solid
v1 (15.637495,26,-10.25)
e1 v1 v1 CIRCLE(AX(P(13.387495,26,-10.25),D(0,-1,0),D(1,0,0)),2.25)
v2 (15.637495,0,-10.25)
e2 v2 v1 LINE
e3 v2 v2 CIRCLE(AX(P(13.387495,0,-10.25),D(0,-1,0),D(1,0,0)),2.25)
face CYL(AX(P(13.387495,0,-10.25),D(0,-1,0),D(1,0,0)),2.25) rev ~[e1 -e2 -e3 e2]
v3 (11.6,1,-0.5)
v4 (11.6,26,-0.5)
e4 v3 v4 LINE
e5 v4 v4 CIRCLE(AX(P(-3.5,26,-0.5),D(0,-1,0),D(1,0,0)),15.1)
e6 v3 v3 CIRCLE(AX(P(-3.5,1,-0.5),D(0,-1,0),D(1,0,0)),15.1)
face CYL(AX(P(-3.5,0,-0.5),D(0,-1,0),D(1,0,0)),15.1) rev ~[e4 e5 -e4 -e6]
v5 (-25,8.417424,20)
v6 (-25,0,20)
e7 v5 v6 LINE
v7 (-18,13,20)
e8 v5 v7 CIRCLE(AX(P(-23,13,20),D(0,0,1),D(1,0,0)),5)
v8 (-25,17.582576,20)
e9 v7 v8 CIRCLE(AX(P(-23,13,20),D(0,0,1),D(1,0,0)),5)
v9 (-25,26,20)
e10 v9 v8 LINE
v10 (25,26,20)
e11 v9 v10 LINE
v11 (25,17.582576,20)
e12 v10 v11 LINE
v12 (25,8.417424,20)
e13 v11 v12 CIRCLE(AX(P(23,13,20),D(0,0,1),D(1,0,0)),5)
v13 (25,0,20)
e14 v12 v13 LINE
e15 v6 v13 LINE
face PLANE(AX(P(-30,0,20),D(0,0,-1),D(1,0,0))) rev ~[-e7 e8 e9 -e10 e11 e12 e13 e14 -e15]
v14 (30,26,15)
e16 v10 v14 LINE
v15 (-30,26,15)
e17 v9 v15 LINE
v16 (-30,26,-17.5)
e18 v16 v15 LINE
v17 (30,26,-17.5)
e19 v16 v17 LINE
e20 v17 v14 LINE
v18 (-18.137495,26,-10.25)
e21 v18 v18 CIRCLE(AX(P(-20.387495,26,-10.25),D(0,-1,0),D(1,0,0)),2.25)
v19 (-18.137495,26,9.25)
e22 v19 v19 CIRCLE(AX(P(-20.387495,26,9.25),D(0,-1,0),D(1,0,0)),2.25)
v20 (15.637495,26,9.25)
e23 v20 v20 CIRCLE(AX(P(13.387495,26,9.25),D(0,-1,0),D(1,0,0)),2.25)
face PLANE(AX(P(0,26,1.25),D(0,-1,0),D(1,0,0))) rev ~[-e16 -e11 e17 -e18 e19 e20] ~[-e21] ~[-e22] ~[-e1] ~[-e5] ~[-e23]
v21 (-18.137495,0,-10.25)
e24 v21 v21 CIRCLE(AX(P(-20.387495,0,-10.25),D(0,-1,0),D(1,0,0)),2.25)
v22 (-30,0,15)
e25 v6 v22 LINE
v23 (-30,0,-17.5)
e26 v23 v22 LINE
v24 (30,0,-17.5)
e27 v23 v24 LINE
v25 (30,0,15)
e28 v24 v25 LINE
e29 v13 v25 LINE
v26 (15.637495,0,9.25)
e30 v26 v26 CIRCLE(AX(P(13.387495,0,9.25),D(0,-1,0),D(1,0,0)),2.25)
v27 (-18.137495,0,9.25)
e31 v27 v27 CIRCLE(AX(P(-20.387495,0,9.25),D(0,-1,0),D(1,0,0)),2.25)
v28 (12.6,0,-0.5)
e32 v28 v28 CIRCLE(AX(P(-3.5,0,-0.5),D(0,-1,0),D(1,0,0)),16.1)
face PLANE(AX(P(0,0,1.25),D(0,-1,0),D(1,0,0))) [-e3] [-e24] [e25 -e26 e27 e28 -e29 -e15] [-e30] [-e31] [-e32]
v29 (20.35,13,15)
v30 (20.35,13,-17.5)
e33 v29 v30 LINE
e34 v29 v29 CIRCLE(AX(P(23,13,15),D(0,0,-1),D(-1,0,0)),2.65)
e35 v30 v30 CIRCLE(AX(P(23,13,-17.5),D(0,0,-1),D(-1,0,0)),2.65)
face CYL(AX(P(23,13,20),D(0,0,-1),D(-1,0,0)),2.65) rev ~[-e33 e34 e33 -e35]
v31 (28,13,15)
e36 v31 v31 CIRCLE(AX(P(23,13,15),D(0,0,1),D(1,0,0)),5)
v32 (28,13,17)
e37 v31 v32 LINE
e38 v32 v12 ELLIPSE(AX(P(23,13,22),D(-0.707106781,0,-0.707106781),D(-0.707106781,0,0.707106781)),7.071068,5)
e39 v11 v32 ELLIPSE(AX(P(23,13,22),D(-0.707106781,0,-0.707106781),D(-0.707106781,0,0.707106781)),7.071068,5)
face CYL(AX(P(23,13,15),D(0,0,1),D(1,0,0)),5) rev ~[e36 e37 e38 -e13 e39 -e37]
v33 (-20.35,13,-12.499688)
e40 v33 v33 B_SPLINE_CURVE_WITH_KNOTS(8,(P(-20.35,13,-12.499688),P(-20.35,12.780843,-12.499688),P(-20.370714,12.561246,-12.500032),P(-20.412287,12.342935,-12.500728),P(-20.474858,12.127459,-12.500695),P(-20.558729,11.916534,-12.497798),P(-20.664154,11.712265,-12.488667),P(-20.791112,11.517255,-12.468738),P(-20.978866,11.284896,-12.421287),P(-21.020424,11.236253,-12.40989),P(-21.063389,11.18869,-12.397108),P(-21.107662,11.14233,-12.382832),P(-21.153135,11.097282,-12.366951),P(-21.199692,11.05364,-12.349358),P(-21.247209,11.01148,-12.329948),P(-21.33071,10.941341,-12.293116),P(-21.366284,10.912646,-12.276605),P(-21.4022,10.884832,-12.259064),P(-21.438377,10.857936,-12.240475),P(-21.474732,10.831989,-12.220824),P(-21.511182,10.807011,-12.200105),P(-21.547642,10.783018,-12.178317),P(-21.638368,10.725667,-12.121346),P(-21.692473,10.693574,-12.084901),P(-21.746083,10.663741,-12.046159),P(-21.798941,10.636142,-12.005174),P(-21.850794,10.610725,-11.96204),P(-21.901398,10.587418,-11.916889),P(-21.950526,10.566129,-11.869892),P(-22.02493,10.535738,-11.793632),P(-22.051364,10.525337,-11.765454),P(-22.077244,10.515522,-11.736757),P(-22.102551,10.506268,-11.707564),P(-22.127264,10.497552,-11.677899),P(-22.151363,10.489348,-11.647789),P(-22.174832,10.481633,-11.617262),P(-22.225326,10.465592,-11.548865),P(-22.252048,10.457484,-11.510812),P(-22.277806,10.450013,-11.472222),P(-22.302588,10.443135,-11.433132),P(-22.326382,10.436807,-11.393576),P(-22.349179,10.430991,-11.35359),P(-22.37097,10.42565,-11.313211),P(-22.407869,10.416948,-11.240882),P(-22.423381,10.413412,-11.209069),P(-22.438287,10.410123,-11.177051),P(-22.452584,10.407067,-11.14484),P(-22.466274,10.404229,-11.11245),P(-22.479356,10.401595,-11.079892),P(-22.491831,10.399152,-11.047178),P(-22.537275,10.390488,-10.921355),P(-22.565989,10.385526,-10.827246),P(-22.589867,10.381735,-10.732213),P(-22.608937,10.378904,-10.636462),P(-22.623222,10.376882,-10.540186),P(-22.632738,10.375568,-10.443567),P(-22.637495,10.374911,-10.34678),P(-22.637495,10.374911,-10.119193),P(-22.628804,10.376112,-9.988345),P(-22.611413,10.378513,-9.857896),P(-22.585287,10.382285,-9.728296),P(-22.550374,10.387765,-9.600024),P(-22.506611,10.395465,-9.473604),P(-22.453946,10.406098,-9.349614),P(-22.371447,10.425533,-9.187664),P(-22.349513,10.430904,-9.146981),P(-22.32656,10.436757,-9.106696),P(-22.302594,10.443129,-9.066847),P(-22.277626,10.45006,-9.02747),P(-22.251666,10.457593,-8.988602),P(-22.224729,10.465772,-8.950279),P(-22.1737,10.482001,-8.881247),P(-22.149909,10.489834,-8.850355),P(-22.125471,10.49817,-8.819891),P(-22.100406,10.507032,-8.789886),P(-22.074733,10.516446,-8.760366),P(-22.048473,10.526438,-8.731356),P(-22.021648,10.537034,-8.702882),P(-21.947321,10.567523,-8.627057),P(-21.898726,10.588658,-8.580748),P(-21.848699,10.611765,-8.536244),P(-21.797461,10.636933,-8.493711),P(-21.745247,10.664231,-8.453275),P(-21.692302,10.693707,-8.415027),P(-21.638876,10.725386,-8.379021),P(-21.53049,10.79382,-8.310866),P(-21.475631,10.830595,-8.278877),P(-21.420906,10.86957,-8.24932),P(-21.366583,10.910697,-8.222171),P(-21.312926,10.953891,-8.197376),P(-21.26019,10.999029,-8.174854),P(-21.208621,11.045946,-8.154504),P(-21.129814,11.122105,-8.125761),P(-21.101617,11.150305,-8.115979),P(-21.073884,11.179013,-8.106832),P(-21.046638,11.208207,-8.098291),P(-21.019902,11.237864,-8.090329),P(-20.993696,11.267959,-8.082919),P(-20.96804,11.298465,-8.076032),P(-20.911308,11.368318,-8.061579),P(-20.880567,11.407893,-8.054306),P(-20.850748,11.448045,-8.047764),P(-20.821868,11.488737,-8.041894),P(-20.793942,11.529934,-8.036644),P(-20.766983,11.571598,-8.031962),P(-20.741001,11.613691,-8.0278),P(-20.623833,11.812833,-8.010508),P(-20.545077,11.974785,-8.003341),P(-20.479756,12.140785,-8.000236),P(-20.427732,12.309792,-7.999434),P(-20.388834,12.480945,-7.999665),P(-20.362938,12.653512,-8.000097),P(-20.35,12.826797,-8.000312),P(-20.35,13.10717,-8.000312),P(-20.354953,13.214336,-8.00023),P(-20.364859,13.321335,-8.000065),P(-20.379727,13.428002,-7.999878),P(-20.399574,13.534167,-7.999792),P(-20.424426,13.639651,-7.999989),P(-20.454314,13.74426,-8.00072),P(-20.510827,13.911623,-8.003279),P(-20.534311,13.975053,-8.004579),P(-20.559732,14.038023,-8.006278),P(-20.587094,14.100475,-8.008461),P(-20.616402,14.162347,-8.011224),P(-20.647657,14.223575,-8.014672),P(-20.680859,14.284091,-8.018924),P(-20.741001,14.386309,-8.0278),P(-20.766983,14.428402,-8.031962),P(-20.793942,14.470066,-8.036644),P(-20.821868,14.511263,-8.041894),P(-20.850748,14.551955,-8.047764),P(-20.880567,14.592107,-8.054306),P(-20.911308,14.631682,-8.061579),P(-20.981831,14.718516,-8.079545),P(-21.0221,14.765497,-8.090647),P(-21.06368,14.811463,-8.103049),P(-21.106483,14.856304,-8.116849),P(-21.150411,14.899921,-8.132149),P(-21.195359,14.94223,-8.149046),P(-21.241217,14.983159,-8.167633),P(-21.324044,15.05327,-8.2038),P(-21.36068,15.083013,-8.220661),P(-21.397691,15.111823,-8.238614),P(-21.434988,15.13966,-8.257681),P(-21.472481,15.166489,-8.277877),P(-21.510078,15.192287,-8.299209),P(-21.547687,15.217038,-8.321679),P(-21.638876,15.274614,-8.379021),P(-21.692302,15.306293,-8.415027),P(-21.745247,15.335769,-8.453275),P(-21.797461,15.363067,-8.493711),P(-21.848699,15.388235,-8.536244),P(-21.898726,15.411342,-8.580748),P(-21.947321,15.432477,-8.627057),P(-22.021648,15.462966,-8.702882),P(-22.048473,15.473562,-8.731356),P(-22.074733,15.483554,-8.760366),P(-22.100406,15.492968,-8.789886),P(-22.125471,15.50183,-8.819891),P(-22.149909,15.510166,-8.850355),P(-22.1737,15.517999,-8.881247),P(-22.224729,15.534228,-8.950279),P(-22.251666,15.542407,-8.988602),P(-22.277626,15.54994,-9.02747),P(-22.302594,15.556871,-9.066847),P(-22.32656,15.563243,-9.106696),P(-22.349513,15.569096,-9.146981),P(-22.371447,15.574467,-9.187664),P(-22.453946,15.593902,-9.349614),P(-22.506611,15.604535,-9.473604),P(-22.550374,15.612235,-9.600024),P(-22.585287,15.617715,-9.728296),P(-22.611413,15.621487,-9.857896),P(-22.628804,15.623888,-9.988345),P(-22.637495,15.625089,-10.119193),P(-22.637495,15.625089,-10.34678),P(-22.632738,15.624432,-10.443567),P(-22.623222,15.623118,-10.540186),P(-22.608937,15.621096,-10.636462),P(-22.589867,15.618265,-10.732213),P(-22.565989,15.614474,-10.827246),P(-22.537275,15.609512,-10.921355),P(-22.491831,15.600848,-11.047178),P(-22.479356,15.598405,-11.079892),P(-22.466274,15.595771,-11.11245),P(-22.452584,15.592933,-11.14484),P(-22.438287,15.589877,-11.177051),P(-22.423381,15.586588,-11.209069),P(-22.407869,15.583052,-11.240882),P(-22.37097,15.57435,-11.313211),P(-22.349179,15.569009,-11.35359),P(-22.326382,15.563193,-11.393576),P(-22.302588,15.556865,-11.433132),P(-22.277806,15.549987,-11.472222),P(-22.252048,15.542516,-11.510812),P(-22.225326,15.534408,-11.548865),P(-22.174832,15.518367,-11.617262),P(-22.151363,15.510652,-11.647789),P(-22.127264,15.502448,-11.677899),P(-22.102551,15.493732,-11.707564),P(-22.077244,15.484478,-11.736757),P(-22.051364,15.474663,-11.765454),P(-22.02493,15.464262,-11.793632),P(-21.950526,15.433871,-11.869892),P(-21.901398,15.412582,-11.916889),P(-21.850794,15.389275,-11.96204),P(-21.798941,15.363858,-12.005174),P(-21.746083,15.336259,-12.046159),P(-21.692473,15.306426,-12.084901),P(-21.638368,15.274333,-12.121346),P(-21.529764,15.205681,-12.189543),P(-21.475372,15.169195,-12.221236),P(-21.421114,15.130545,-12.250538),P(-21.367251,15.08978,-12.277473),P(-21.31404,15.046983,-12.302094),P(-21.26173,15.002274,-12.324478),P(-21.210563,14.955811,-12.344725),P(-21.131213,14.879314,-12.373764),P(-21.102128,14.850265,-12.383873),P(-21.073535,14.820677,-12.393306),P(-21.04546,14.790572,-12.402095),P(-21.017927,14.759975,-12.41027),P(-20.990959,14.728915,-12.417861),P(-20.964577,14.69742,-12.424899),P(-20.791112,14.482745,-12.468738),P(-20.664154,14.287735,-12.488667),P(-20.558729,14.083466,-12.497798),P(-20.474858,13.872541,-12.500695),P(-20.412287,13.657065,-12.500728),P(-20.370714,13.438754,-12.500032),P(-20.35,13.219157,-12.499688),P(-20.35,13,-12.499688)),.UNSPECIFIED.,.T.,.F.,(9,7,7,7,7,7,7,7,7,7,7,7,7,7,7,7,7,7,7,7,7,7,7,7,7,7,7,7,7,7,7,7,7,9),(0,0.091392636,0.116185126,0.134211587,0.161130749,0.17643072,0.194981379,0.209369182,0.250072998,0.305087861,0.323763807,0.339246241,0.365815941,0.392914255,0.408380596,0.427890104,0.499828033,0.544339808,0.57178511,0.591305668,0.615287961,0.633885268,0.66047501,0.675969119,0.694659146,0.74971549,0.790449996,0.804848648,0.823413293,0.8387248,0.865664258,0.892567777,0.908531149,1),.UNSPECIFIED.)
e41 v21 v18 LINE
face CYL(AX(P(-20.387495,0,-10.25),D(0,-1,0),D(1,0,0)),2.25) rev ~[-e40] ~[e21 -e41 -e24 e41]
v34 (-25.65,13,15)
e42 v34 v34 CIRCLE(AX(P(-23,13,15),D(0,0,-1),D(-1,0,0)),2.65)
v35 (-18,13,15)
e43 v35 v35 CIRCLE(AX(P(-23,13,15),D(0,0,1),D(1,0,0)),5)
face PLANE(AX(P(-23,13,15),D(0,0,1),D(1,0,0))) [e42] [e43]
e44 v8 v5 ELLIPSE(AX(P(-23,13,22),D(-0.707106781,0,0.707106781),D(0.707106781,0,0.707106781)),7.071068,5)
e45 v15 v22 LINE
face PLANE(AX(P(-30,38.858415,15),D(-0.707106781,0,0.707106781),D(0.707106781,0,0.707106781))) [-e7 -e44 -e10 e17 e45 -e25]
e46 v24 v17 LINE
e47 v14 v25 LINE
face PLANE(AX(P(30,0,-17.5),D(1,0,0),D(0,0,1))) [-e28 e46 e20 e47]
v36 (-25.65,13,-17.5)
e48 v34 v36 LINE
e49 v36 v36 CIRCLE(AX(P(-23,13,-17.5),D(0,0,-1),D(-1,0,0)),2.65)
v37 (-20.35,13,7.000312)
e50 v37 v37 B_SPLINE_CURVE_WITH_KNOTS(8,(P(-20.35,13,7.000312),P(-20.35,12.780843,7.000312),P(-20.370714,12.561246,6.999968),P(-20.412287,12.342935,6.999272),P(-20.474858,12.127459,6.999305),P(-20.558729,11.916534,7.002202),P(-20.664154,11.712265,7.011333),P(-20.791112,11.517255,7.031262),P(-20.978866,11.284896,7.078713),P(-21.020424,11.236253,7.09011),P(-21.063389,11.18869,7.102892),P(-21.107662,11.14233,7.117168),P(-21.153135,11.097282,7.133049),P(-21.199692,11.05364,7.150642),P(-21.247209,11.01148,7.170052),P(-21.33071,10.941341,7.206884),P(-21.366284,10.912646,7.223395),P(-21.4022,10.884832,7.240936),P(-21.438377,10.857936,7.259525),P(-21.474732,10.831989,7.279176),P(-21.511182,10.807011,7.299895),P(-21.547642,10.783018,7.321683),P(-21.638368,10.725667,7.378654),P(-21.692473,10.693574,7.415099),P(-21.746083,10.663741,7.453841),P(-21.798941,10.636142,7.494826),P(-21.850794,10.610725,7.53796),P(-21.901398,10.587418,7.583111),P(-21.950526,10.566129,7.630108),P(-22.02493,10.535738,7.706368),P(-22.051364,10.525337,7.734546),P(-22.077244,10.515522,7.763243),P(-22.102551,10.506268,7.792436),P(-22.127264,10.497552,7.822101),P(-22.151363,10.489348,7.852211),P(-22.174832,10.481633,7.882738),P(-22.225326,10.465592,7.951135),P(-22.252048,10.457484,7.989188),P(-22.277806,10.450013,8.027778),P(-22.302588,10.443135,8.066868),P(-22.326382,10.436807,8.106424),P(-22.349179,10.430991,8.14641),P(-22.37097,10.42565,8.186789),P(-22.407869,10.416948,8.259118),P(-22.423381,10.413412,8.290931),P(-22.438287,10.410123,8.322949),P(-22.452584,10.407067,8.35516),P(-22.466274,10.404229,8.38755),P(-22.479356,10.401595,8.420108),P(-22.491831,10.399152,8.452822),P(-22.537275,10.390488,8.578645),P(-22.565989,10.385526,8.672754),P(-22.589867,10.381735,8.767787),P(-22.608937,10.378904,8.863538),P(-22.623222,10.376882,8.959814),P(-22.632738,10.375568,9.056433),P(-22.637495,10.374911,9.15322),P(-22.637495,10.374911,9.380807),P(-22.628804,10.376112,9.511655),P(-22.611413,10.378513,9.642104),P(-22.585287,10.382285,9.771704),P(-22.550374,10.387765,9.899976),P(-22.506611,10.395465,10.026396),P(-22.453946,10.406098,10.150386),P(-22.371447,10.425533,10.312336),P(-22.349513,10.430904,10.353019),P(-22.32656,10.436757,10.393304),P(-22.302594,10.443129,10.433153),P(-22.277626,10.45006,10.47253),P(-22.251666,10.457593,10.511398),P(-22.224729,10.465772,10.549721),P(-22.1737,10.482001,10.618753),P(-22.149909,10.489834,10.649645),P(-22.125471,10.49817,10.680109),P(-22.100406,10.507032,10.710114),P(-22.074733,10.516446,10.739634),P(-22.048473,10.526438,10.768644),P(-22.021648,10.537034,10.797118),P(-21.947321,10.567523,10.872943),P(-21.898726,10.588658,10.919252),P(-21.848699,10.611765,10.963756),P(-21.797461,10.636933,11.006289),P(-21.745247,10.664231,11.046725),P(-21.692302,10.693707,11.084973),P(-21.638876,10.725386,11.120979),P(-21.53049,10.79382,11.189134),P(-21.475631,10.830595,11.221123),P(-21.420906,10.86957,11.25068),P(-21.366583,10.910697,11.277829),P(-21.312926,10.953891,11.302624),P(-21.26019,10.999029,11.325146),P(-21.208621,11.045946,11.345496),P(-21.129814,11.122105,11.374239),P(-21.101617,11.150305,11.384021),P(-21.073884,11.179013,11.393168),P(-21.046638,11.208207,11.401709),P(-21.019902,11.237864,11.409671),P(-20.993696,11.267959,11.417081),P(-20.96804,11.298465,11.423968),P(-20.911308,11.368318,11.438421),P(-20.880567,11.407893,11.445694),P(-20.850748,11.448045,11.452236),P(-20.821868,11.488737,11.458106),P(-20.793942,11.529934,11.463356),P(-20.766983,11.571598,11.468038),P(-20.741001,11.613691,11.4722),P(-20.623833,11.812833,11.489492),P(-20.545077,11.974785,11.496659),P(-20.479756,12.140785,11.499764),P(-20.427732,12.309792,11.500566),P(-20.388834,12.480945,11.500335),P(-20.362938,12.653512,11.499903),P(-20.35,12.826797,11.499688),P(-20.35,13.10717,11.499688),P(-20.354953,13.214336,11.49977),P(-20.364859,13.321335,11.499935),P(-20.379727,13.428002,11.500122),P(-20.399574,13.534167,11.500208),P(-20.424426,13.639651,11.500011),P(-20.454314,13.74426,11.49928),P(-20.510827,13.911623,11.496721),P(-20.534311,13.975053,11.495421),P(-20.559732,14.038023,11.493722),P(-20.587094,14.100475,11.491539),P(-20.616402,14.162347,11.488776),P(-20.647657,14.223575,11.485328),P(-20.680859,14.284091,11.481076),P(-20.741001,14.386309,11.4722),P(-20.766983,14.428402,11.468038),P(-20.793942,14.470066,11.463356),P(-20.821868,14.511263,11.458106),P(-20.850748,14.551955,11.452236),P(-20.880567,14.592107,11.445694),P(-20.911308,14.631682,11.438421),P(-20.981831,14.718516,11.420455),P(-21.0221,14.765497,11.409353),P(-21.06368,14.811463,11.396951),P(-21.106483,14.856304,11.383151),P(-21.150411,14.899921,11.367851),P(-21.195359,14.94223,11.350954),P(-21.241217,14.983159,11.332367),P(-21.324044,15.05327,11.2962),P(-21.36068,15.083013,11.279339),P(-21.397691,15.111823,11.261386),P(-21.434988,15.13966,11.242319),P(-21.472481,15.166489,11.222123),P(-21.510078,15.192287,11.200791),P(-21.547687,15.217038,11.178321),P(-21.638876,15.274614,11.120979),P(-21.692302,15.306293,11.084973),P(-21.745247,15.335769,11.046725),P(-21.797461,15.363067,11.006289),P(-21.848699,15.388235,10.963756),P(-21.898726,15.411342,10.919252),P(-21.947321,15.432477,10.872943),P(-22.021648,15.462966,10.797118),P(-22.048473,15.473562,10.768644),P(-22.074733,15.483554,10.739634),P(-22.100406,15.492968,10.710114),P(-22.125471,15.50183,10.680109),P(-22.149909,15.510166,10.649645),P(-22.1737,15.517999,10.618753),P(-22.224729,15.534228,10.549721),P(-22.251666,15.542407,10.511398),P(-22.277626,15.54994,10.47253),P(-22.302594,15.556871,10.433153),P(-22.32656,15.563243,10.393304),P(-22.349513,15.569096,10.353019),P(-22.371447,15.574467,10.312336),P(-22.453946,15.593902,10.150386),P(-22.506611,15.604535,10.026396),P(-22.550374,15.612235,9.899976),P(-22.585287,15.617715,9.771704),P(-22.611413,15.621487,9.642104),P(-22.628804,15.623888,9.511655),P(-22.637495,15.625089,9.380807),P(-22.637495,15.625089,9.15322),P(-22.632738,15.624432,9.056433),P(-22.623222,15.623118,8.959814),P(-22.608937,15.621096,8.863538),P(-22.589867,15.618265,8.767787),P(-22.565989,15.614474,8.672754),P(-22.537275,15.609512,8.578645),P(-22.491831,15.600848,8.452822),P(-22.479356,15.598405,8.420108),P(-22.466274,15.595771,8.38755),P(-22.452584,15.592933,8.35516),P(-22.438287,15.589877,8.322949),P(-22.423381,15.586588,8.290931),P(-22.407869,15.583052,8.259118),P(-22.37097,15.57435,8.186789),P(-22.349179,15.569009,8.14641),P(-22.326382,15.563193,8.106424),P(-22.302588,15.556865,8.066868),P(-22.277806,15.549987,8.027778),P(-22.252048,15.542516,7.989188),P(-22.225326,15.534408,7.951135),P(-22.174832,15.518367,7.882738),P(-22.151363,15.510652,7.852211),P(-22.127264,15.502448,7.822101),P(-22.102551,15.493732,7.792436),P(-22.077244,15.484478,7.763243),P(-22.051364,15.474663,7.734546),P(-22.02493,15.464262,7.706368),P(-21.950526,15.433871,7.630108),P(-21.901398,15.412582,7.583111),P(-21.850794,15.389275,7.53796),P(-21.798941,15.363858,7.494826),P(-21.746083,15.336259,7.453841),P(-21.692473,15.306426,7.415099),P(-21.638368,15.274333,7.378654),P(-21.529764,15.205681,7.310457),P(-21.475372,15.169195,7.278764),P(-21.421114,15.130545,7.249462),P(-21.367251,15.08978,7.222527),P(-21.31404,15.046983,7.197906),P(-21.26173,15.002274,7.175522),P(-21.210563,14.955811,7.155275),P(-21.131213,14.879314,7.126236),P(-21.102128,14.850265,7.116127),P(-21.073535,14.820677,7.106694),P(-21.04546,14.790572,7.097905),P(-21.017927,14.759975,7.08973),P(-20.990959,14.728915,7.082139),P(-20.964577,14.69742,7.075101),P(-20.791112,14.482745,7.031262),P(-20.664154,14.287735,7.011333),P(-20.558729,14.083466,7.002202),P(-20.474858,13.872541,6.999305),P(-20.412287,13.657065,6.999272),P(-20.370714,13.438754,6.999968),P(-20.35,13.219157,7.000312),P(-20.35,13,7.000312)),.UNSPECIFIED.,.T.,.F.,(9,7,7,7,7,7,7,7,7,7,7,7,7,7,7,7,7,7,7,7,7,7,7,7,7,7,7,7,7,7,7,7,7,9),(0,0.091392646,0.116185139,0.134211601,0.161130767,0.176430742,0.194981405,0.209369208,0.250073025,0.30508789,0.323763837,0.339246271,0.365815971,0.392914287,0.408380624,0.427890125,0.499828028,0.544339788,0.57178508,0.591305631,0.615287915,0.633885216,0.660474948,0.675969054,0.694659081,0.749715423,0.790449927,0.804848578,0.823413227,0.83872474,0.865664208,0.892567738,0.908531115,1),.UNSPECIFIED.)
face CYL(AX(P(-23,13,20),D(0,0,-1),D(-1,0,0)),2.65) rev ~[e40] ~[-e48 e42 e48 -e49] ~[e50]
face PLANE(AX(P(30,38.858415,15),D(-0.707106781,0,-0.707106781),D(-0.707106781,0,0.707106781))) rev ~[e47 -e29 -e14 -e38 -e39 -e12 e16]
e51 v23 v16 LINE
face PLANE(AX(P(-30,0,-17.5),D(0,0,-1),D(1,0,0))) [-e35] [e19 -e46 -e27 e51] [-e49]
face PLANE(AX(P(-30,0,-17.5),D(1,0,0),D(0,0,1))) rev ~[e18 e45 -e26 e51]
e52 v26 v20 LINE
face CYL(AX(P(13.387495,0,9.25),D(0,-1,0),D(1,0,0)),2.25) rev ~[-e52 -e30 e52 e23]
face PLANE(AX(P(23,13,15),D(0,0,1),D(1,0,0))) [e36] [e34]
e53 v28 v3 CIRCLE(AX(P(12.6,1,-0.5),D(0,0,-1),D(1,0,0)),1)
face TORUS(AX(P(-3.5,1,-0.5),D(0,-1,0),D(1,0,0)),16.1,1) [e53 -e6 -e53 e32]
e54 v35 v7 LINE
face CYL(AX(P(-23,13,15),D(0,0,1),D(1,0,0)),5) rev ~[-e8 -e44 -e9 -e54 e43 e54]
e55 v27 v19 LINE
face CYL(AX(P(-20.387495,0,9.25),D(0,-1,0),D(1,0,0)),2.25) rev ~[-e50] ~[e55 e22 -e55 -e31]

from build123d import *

# Parameters (mm, degrees)
F0_W           = 60
F0_H           = 37.5
F0_R           = 2.25
F0_R_2         = 15.1
F1_DEPTH       = 26
F3_D           = 5.3
F3_CBORE_D     = 10
F3_CBORE_DEPTH = 5
F4_T1_DEPTH    = 51.7168298797
F5_R           = 1


# Not quite as in the source:
# - a fillet or chamfer that OpenCascade refuses, or shapes differently, is made with other operations: its cross-section is extruded or revolved along the edge and cut away or added


with BuildPart() as f1:
    # F0 (on Front) → F1 (new body)
    with BuildSketch(Plane.XZ):
        with Locations((0, 1.25)):
            Rectangle(F0_W, F0_H)
        with Locations((-20.3874953738, -10.25)):
            Circle(F0_R, mode=Mode.SUBTRACT)
        with Locations((-3.5, -0.5)):
            Circle(F0_R_2, mode=Mode.SUBTRACT)
        with Locations((13.3874953738, -10.25)):
            Circle(F0_R, mode=Mode.SUBTRACT)
        with Locations((-20.3874953738, 9.25)):
            Circle(F0_R, mode=Mode.SUBTRACT)
        with Locations((13.3874953738, 9.25)):
            Circle(F0_R, mode=Mode.SUBTRACT)
    extrude(amount=-F1_DEPTH)

    # F3 (through all)
    with Locations(Plane.XY.offset(20)):
        with Locations((-23, 13), (23, 13)):
            CounterBoreHole(F3_D / 2, F3_CBORE_D / 2, F3_CBORE_DEPTH)

    # F4: chamfer of 5 on 2 edges, made by hand

    # F4_s2 → F4_t1 (cut)
    with BuildSketch(Plane.XZ.offset(-38.8584149398)):
        Polygon((-30, 15), (-25, 20), (-30, 20), align=None)
        Polygon((30, 15), (25, 20), (30, 20), align=None)
    extrude(amount=F4_T1_DEPTH, mode=Mode.SUBTRACT)

    # F5
    f5_edges = [f1.edges().sort_by_distance(p)[0] for p in [
        (-18.6, 0, -0.5),
    ]]
    fillet(f5_edges, radius=F5_R)


solid = f1.part
